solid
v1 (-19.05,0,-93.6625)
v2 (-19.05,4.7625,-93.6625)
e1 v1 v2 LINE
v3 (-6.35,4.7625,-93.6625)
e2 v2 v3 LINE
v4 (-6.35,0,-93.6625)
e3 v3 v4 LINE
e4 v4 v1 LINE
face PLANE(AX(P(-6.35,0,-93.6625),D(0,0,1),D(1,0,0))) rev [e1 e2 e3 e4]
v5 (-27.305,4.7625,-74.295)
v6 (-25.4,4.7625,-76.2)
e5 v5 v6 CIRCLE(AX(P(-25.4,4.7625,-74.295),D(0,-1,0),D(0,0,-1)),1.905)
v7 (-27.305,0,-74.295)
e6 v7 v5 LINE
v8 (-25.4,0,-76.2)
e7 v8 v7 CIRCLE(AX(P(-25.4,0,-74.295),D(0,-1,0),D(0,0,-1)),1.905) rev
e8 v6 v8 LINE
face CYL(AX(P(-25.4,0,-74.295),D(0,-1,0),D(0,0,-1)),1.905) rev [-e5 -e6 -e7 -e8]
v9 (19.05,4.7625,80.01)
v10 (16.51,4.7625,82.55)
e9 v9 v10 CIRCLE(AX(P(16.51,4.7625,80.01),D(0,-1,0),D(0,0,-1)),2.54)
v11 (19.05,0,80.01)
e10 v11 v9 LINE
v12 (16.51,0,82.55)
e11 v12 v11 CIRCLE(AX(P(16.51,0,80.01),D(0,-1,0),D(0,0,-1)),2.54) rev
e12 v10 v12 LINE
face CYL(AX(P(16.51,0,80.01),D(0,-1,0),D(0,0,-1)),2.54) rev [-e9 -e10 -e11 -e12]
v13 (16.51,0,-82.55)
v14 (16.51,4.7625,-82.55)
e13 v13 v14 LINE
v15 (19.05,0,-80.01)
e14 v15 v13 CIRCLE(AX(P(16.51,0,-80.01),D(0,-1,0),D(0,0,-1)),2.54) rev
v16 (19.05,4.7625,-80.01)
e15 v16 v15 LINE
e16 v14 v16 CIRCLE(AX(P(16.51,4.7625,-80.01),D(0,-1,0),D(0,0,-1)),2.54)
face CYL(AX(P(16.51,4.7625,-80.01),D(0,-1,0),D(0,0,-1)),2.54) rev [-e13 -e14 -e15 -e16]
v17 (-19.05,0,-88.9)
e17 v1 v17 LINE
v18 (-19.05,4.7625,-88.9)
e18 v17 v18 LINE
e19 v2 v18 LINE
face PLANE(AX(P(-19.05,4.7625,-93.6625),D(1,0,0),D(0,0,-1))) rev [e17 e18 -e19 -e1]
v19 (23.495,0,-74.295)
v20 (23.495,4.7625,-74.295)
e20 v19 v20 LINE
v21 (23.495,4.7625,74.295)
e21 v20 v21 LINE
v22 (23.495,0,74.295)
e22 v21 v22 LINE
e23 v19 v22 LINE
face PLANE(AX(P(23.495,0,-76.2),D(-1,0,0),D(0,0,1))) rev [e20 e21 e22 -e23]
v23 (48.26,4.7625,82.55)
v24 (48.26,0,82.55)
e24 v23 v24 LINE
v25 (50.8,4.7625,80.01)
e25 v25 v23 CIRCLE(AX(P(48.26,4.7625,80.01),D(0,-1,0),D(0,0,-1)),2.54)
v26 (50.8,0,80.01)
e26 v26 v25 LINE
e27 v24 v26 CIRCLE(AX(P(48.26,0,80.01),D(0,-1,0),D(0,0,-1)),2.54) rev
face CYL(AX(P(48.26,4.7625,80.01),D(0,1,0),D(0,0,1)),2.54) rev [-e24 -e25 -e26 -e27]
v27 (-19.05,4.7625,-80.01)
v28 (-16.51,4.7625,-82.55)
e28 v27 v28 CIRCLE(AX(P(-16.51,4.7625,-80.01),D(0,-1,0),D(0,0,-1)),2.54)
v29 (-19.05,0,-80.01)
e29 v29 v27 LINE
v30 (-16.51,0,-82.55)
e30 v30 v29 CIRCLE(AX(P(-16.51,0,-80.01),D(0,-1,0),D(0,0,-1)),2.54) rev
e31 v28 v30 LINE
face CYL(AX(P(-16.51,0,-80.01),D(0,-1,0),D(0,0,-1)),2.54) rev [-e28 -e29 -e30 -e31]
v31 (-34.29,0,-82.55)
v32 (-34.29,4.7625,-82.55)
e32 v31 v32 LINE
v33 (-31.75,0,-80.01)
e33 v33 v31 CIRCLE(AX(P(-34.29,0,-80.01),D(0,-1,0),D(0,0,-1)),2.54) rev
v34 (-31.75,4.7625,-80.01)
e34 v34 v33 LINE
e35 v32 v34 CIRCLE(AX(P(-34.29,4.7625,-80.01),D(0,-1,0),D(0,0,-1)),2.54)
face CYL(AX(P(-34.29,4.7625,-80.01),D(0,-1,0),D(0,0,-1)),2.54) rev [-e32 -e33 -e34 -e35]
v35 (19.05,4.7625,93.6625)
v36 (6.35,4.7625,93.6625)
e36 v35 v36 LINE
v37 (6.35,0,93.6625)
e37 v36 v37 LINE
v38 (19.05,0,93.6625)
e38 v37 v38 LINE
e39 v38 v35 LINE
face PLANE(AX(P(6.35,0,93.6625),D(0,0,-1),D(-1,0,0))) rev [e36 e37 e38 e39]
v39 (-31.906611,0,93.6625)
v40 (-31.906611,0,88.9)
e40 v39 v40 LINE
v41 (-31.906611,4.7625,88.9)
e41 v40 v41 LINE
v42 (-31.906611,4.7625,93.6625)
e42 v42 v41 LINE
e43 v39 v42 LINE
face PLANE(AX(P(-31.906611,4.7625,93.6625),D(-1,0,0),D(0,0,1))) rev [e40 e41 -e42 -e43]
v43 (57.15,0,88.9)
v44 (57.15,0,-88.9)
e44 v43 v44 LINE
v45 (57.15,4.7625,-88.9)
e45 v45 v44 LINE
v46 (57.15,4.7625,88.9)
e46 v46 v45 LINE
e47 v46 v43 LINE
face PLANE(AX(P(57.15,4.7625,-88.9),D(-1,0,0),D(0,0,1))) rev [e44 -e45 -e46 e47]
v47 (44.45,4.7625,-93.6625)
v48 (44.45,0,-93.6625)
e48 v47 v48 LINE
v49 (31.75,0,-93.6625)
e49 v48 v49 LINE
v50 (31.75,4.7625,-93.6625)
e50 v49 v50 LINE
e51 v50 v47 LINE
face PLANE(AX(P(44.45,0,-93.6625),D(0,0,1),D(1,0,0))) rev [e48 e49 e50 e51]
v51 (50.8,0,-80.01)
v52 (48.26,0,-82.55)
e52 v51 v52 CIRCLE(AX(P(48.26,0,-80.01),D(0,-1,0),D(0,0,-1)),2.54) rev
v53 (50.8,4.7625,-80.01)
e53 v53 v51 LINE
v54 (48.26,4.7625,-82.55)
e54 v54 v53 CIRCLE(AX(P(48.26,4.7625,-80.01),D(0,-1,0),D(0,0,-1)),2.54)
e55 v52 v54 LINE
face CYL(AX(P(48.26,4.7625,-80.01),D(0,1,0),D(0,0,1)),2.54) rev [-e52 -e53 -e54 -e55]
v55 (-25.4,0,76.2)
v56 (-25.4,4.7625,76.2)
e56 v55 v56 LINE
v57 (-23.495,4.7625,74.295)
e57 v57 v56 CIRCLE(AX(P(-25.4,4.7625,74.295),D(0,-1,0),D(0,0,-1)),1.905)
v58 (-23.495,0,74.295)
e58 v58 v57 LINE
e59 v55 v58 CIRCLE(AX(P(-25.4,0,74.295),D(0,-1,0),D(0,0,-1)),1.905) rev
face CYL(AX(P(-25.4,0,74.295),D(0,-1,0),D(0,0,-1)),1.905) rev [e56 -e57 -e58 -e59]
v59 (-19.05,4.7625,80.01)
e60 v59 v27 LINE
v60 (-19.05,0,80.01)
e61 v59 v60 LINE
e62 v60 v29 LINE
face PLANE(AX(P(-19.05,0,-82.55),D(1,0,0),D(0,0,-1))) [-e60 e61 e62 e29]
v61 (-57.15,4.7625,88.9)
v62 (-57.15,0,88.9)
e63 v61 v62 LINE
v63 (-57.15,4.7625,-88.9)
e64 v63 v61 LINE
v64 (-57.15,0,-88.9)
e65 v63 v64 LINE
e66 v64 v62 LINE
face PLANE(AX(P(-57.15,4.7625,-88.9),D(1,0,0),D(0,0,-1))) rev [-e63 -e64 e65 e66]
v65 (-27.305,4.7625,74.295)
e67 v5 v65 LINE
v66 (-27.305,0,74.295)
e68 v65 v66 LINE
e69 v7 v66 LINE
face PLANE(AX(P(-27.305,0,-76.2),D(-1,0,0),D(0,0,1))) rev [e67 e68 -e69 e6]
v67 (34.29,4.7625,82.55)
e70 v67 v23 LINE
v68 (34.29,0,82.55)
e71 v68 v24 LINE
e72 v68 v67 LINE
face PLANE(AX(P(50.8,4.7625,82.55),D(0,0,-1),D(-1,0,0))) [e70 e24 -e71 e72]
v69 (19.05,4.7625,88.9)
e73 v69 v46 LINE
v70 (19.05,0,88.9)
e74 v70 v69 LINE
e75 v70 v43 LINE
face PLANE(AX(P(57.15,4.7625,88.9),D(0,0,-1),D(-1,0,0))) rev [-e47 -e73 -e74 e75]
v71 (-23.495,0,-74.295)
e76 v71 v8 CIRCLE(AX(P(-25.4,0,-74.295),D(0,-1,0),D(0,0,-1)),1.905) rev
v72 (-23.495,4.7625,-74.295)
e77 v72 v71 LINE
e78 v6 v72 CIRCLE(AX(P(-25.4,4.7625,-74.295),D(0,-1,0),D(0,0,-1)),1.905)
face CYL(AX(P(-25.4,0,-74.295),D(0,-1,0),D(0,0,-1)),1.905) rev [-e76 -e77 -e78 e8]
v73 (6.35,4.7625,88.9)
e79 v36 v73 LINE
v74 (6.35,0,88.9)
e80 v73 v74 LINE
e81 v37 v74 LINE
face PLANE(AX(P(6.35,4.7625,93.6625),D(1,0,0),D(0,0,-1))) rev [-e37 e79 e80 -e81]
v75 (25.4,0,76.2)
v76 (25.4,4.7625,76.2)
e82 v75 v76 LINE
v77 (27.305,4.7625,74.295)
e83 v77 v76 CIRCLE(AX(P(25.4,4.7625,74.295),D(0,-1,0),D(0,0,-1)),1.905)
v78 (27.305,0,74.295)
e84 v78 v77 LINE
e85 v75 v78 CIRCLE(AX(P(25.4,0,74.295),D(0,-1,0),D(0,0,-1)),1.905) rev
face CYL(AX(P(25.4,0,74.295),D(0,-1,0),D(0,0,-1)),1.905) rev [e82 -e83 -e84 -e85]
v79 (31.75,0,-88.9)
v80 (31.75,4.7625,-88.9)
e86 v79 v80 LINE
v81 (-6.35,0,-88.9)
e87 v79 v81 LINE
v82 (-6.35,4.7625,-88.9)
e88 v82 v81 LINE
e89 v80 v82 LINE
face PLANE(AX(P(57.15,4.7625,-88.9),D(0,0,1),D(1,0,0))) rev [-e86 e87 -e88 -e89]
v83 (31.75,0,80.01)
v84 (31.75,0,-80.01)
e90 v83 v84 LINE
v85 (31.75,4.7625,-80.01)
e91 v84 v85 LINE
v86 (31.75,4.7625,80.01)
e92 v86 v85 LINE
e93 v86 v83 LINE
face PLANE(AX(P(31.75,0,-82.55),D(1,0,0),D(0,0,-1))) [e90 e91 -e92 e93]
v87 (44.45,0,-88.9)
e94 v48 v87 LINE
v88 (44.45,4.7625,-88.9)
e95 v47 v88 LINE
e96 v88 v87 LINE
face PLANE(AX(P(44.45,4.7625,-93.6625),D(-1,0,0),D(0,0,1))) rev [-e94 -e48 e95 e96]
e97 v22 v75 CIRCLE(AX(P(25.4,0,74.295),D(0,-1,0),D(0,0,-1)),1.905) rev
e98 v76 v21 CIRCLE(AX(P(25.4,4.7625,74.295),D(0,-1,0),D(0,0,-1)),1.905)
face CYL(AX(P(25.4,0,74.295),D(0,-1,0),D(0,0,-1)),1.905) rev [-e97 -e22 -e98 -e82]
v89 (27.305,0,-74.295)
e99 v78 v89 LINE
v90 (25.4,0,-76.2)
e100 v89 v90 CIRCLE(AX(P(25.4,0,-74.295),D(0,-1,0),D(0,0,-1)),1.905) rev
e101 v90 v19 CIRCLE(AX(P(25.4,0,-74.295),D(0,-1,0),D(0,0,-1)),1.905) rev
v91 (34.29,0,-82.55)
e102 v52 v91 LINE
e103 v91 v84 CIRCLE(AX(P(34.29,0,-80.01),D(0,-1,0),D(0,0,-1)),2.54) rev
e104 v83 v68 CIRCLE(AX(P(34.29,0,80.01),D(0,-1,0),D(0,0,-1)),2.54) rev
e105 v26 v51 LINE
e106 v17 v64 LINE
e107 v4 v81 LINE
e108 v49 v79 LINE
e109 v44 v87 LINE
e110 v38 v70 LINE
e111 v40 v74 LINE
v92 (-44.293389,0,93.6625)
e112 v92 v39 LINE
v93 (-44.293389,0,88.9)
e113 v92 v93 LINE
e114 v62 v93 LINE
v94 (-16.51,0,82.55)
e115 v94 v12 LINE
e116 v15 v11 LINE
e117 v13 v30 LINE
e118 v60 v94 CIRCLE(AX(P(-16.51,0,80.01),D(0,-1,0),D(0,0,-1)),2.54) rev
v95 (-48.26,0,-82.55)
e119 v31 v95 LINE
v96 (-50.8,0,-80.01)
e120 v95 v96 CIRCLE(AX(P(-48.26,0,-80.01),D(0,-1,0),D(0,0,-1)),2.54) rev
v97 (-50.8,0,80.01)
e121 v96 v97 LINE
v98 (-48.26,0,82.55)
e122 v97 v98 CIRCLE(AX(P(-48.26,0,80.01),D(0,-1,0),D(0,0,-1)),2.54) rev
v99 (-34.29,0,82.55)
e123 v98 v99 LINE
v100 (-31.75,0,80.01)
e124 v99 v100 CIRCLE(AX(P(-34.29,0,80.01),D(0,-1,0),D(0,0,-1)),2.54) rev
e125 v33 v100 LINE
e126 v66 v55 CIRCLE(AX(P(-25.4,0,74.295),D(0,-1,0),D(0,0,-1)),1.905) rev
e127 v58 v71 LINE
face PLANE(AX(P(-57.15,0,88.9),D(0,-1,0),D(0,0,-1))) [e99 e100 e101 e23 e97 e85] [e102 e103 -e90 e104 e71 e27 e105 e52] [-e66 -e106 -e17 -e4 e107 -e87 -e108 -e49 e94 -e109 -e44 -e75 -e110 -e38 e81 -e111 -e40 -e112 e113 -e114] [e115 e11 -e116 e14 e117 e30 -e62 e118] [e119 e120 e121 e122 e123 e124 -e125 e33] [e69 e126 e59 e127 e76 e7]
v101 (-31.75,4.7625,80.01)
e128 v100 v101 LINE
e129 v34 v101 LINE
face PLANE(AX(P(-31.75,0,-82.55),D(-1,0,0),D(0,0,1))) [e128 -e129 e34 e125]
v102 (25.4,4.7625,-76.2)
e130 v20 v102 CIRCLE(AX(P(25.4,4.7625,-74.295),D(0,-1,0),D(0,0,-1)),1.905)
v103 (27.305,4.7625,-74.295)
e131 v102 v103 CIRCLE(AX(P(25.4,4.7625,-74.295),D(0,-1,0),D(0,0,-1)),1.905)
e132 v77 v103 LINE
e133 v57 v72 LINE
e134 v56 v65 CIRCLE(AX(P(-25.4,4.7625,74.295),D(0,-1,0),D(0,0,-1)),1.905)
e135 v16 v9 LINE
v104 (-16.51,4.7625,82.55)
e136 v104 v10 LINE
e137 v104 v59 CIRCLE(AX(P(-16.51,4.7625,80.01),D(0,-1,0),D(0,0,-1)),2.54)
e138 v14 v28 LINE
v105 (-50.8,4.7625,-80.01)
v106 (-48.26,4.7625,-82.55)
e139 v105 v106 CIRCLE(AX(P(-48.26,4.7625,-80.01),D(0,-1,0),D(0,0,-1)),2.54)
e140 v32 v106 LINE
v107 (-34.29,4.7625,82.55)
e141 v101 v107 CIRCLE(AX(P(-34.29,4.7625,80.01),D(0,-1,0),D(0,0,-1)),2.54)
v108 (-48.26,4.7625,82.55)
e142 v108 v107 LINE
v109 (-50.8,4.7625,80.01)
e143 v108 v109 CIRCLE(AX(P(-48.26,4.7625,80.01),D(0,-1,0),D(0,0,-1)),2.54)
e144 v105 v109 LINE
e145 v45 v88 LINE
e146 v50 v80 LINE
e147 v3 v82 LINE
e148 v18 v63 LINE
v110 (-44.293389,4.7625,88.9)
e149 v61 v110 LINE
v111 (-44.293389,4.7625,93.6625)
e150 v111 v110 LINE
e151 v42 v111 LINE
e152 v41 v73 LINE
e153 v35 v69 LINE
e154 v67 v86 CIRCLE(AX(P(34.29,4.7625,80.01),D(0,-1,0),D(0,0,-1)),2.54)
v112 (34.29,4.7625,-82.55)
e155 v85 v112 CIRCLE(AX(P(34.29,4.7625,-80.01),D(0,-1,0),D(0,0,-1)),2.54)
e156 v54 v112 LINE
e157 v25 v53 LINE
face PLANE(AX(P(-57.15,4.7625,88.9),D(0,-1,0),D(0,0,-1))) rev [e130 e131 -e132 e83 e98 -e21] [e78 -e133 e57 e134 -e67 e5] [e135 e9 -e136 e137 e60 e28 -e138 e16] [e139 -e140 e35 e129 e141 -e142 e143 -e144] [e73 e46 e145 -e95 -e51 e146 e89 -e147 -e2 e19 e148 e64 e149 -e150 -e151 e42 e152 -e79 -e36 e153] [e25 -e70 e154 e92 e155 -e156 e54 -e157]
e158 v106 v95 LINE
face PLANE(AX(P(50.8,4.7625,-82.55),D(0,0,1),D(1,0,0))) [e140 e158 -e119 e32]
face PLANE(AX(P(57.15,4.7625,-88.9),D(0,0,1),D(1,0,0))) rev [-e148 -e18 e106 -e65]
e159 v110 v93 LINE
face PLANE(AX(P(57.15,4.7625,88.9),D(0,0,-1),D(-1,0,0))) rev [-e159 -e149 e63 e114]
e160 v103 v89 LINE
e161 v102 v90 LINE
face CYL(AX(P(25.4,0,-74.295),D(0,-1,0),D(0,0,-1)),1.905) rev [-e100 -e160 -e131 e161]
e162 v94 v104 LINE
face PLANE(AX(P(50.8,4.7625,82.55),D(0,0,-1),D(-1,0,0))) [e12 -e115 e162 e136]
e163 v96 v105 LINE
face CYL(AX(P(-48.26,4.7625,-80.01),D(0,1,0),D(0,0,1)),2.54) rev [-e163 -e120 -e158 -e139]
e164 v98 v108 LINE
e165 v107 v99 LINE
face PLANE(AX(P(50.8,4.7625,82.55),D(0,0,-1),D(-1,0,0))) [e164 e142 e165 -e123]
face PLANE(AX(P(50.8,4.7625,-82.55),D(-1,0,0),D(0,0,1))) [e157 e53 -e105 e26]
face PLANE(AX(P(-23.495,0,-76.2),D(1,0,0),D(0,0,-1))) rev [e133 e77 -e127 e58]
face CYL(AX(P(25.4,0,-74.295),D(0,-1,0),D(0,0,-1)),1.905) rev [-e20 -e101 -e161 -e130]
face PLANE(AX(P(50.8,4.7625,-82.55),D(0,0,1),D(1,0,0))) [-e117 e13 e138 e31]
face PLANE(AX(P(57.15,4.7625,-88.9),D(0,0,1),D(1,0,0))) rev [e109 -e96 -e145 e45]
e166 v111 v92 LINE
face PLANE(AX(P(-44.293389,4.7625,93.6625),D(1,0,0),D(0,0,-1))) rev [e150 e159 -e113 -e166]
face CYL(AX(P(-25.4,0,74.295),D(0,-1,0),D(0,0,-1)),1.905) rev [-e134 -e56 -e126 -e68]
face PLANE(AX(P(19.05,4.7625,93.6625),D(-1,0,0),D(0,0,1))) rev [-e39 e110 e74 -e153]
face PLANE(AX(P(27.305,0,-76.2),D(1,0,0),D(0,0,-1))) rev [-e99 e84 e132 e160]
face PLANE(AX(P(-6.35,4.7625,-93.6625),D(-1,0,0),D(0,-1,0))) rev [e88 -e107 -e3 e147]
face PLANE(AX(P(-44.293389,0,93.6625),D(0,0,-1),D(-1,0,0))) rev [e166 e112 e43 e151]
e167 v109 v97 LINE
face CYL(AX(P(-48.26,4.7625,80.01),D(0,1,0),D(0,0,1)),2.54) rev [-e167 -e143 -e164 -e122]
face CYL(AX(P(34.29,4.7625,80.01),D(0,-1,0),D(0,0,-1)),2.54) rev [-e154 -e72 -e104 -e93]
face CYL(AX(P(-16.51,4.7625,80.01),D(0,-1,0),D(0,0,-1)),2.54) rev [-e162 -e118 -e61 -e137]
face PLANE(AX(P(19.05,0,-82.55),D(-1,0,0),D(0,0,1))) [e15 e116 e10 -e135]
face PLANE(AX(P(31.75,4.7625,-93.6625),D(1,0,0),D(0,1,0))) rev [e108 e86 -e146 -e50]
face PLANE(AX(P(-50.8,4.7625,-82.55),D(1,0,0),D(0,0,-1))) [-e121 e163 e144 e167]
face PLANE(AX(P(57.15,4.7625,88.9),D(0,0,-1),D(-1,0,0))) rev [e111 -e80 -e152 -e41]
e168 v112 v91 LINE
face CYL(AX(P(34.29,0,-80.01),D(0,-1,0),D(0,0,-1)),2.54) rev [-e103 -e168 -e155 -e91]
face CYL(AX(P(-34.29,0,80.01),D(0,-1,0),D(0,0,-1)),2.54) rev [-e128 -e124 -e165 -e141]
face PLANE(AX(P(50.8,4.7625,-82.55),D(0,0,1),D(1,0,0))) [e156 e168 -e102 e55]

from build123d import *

# Parameters (mm, degrees)
SKETCH1_W           = 114.3
SKETCH1_H           = 177.8
SKETCH1_W_2         = 101.6
SKETCH1_H_2         = 165.1
BOSS_EXTRUDE1_DEPTH = 4.7625
SKETCH2_W           = 12.38677804
SKETCH2_H           = 4.7625
SKETCH2_W_2         = 12.7
BOSS_EXTRUDE2_DEPTH = 4.7625
SKETCH3_W           = 12.7
SKETCH3_H           = 4.7625
BOSS_EXTRUDE3_DEPTH = 4.7625
FILLET1_R           = 2.54
SKETCH7_W           = 12.7
SKETCH7_H           = 165.1
SKETCH7_W_2         = 3.81
SKETCH7_H_2         = 152.4
BOSS_EXTRUDE6_DEPTH = 4.7625
FILLET3_R           = 2.54
FILLET4_R           = 1.905


with BuildPart() as part:
    # Sketch1 → Boss-Extrude1 (new body)
    with BuildSketch(Plane(origin=(0, 0, 0), x_dir=(1, 0, 0), z_dir=(0, 1, 0))):
        Rectangle(SKETCH1_W, SKETCH1_H)
        Rectangle(SKETCH1_W_2, SKETCH1_H_2, mode=Mode.SUBTRACT)
    extrude(amount=BOSS_EXTRUDE1_DEPTH)

    # Sketch2 → Boss-Extrude2 (add)
    with BuildSketch(Plane.XY.offset(88.9)):
        with Locations((-38.1, 2.38125)):
            Rectangle(SKETCH2_W, SKETCH2_H)
        with Locations((12.7, 2.38125)):
            Rectangle(SKETCH2_W_2, SKETCH2_H)
    extrude(amount=BOSS_EXTRUDE2_DEPTH)

    # Sketch3 → Boss-Extrude3 (add)
    with BuildSketch(Plane(origin=(0, 0, -88.9), x_dir=(-1, 0, 0), z_dir=(0, 0, -1))):
        with Locations((-38.1, 2.38125)):
            Rectangle(SKETCH3_W, SKETCH3_H)
        with Locations((12.7, 2.38125)):
            Rectangle(SKETCH3_W, SKETCH3_H)
    extrude(amount=BOSS_EXTRUDE3_DEPTH)

    # Fillet1
    fillet1_edges = [part.edges().sort_by_distance(p)[0] for p in [
        (50.8, 2.38125, 82.55),
        (50.8, 2.38125, -82.55),
        (-50.8, 2.38125, -82.55),
        (-50.8, 2.38125, 82.55),
    ]]
    fillet(fillet1_edges, radius=FILLET1_R)

    # Sketch7 → Boss-Extrude6 (add)
    # profile 1 of 2: a face of its own
    with BuildSketch(Plane(origin=(0, 4.7625, 0), x_dir=(1, 0, 0), z_dir=(0, 1, 0))):
        with Locations((-25.4, 0)):
            Rectangle(SKETCH7_W, SKETCH7_H)
        with Locations((-25.4, 0)):
            Rectangle(SKETCH7_W_2, SKETCH7_H_2, mode=Mode.SUBTRACT)
    # profile 2 of 2: a face of its own
    with BuildSketch(Plane(origin=(0, 4.7625, 0), x_dir=(1, 0, 0), z_dir=(0, 1, 0))):
        with Locations((25.4, 0)):
            Rectangle(SKETCH7_W, SKETCH7_H)
        with Locations((25.4, 0)):
            Rectangle(SKETCH7_W_2, SKETCH7_H_2, mode=Mode.SUBTRACT)
    extrude(amount=-BOSS_EXTRUDE6_DEPTH)

    # Fillet3
    fillet3_edges = [part.edges().sort_by_distance(p)[0] for p in [
        (-31.75, 2.38125, 82.55),
        (-31.75, 2.38125, -82.55),
        (-19.05, 2.38125, -82.55),
        (-19.05, 2.38125, 82.55),
        (19.05, 2.38125, 82.55),
        (19.05, 2.38125, -82.55),
        (31.75, 2.38125, -82.55),
        (31.75, 2.38125, 82.55),
    ]]
    fillet(fillet3_edges, radius=FILLET3_R)

    # Fillet4
    fillet4_edges = [part.edges().sort_by_distance(p)[0] for p in [
        (27.305, 2.38125, -76.2),
        (23.495, 2.38125, -76.2),
        (27.305, 2.38125, 76.2),
        (23.495, 2.38125, 76.2),
        (-23.495, 2.38125, 76.2),
        (-27.305, 2.38125, 76.2),
        (-23.495, 2.38125, -76.2),
        (-27.305, 2.38125, -76.2),
    ]]
    fillet(fillet4_edges, radius=FILLET4_R - 0.0001)  # a hair under: the kernel refuses the full size


solid = part.part
